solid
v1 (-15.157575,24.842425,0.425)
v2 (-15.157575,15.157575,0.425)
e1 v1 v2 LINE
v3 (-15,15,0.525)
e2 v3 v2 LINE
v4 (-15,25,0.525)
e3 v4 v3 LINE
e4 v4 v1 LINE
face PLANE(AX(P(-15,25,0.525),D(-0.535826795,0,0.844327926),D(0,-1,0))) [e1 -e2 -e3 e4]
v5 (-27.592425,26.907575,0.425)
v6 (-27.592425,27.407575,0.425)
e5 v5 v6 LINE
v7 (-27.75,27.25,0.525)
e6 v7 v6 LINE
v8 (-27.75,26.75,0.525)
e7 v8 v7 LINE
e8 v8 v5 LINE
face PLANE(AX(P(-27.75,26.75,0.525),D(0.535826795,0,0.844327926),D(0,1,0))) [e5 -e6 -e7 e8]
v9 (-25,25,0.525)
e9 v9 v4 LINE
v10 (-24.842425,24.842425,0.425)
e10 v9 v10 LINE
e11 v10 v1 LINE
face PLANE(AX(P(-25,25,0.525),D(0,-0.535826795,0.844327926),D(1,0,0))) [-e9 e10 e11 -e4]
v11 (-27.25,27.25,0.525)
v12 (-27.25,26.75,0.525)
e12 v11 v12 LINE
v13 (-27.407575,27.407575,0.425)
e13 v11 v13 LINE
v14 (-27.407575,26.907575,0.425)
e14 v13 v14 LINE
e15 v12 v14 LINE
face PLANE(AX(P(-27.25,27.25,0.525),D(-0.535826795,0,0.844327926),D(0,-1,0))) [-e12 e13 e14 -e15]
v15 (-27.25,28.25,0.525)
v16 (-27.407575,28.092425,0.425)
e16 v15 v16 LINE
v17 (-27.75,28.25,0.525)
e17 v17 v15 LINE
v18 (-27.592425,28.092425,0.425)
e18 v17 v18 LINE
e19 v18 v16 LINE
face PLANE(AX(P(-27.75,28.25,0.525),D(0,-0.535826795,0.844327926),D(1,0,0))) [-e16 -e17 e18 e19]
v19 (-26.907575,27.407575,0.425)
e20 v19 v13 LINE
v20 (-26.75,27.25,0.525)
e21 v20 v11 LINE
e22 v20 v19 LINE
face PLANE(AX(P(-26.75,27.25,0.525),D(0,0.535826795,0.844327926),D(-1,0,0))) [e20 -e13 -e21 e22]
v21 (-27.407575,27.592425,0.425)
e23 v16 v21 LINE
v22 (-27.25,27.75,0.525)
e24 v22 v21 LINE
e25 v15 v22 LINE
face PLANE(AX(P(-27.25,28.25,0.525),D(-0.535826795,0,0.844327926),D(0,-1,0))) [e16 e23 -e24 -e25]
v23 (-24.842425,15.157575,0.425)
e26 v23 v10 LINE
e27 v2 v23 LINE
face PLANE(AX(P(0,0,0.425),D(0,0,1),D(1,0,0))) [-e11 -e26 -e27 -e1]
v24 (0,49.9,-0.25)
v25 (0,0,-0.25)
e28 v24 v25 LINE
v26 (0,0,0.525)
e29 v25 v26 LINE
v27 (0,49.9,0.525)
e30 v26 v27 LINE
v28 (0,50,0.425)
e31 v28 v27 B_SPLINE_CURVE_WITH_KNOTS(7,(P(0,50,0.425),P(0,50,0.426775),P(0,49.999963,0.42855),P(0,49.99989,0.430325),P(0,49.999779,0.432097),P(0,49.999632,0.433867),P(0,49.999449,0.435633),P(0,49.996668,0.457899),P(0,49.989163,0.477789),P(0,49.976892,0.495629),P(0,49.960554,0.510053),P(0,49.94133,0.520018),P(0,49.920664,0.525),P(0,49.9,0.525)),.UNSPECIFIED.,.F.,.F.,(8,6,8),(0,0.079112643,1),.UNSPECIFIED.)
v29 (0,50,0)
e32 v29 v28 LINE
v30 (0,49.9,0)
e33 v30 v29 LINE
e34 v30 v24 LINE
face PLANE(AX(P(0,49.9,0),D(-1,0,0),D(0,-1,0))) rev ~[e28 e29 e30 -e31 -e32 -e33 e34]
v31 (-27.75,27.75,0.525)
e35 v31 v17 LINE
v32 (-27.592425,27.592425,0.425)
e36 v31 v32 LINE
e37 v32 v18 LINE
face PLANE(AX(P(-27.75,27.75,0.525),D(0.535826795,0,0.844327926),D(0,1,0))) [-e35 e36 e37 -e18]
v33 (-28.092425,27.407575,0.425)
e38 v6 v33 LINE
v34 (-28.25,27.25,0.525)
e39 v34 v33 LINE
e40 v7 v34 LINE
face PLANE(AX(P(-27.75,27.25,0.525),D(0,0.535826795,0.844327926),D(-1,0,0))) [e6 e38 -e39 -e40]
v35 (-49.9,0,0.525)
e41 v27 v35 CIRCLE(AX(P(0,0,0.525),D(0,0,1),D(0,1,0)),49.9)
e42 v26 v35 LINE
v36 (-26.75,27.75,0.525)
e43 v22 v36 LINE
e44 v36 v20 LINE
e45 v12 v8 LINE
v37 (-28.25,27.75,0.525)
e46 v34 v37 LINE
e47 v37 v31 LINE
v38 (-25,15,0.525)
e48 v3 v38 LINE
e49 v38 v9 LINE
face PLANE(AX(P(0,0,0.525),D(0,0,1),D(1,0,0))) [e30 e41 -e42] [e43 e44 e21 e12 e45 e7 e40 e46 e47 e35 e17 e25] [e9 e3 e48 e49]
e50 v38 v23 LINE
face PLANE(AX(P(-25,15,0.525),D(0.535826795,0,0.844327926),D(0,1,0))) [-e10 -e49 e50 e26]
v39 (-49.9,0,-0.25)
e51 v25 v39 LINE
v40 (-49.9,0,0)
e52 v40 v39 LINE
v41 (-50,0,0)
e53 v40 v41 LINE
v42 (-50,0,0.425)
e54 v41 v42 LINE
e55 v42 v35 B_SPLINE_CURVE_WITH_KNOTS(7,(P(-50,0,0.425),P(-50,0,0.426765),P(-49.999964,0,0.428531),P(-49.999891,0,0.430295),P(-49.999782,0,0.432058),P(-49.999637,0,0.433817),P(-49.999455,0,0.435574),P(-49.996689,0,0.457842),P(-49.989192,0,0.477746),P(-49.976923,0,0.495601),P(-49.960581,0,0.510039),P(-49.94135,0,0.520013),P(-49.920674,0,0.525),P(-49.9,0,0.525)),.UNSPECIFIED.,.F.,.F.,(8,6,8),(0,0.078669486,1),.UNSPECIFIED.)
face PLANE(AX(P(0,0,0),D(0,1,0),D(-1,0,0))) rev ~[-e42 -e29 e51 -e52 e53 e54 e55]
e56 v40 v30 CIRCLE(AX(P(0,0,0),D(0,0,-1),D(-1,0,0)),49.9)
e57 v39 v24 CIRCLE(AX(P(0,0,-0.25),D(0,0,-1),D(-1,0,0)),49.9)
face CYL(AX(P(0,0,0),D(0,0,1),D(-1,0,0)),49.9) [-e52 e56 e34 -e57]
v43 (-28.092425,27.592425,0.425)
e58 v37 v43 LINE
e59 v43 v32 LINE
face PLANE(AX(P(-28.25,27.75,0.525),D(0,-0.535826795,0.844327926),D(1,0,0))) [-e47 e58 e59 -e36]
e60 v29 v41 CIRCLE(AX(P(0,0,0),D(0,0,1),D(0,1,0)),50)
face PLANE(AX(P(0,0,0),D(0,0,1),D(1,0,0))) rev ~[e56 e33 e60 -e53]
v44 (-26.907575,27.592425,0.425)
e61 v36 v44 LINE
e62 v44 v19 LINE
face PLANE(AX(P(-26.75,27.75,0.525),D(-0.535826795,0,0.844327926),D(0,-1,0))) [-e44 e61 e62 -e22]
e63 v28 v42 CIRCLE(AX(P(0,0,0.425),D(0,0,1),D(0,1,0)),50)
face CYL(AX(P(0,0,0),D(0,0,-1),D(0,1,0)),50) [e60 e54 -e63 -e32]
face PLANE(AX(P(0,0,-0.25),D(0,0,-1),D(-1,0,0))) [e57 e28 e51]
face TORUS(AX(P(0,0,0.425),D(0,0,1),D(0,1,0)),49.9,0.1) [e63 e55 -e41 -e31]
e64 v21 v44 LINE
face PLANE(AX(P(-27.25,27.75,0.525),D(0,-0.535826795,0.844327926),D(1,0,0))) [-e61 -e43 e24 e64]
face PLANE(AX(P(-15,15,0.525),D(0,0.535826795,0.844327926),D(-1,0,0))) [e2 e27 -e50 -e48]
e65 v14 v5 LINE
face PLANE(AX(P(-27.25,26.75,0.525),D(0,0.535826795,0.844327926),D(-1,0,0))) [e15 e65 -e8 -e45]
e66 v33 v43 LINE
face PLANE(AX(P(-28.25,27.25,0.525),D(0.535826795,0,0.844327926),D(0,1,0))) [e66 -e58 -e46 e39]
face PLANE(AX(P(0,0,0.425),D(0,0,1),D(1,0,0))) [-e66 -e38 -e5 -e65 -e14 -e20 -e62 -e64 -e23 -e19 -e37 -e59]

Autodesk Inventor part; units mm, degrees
ref_plane "YZ Plane" through (0, 0, 0) normal (1, 0, 0) x (0, 1, 0)
ref_plane "XZ Plane" through (0, 0, 0) normal (0, 1, 0) x (-1, 0, 0)
ref_plane "XY Plane" through (0, 0, 0) normal (0, 0, 1) x (1, 0, 0)
sketch "Sketch1" plane through (0, 0, 0) normal (0, 0, 1) x (1, 0, 0)
  line L0 (0, 0) -> (-50, 0)
  line L1 (0, 0) -> (0, 50)
  arc A0 (0, 50) -> (-50, 0) centre (0, 0) ccw
  dimension "d0" = 50
extrude "Wafer" add sketch "Sketch1" along normal blind 0.525
fillet "OutsideEdge" radius 0.1 1 edges at (-35.3553, 35.3553, 0.525)
sketch "Sketch3" plane through (0, 0, 0) normal (0, 0, -1) x (-1, 0, 0)
  line L0 (0, 50) -> (0, 0)
  arc A0 (49.9, 0) -> (0, 49.9) centre (0, 0) ccw projected
  line L1 (0, 0) -> (49.9, 0) projected
  line L2 (0, 49.9) -> (0, 0) projected
extrude "Wax" add sketch "Sketch3" along normal blind 0.25
sketch "Sketch4" plane through (0, 0, 0.525) normal (0, 0, 1) x (1, 0, 0)
  line L0 (0, 0) -> (-49.9, 0) projected
  line L1 (0, 49.9) -> (0, 0) projected
  line L2 (-24.5, 24.5) -> (-15.5, 24.5) construction
  line L3 (-15.5, 24.5) -> (-15.5, 15.5) construction
  line L4 (-15.5, 15.5) -> (-24.5, 15.5) construction
  line L5 (-24.5, 15.5) -> (-24.5, 24.5) construction
  line L6 (-24.5, 20) -> (-15.5, 20) construction
  line L7 (-20, 24.5) -> (-20, 15.5) construction
  line L8 (-25, 25) -> (-15, 25)
  line L9 (-15, 25) -> (-15, 15)
  line L10 (-15, 15) -> (-25, 15)
  line L11 (-25, 15) -> (-25, 25)
  line L12 (-20, 25) -> (-20, 24.5) construction
  line L13 (-15, 20) -> (-15.5, 20) construction
  line L14 (-27.75, 27.75) -> (-27.25, 27.75) construction
  line L15 (-27.25, 27.75) -> (-27.25, 27.25) construction
  line L16 (-27.25, 27.25) -> (-27.75, 27.25) construction
  line L17 (-27.75, 27.25) -> (-27.75, 27.75) construction
  line L18 (-27.75, 27.5) -> (-27.25, 27.5) construction
  line L19 (-27.5, 27.75) -> (-27.5, 27.25) construction
  line L20 (-27.75, 27.75) -> (-27.75, 28.25)
  line L21 (-27.75, 28.25) -> (-27.25, 28.25)
  line L22 (-27.25, 28.25) -> (-27.25, 27.75)
  line L23 (-27.25, 27.75) -> (-26.75, 27.75)
  line L24 (-26.75, 27.75) -> (-26.75, 27.25)
  line L25 (-26.75, 27.25) -> (-27.25, 27.25)
  line L26 (-27.25, 27.25) -> (-27.25, 26.75)
  line L27 (-27.25, 26.75) -> (-27.75, 26.75)
  line L28 (-27.75, 26.75) -> (-27.75, 27.25)
  line L29 (-27.75, 27.25) -> (-28.25, 27.25)
  line L30 (-28.25, 27.25) -> (-28.25, 27.75)
  line L31 (-28.25, 27.75) -> (-27.75, 27.75)
  point P0 (-20, 20)
  point P1 (-20, 20)
  point P2 (-20, 20)
  dimension "d8" = 20
  dimension "d9" = 20
  dimension "d10" = 9
  dimension "d11" = 10
  dimension "d14" = 0.5
  dimension "d15" = 2.5
  dimension "d16" = 2.5
extrude "Cutout" cut sketch "Sketch4" against normal blind 0.1 draft -57.6
properties part number "carrier-wafer"
